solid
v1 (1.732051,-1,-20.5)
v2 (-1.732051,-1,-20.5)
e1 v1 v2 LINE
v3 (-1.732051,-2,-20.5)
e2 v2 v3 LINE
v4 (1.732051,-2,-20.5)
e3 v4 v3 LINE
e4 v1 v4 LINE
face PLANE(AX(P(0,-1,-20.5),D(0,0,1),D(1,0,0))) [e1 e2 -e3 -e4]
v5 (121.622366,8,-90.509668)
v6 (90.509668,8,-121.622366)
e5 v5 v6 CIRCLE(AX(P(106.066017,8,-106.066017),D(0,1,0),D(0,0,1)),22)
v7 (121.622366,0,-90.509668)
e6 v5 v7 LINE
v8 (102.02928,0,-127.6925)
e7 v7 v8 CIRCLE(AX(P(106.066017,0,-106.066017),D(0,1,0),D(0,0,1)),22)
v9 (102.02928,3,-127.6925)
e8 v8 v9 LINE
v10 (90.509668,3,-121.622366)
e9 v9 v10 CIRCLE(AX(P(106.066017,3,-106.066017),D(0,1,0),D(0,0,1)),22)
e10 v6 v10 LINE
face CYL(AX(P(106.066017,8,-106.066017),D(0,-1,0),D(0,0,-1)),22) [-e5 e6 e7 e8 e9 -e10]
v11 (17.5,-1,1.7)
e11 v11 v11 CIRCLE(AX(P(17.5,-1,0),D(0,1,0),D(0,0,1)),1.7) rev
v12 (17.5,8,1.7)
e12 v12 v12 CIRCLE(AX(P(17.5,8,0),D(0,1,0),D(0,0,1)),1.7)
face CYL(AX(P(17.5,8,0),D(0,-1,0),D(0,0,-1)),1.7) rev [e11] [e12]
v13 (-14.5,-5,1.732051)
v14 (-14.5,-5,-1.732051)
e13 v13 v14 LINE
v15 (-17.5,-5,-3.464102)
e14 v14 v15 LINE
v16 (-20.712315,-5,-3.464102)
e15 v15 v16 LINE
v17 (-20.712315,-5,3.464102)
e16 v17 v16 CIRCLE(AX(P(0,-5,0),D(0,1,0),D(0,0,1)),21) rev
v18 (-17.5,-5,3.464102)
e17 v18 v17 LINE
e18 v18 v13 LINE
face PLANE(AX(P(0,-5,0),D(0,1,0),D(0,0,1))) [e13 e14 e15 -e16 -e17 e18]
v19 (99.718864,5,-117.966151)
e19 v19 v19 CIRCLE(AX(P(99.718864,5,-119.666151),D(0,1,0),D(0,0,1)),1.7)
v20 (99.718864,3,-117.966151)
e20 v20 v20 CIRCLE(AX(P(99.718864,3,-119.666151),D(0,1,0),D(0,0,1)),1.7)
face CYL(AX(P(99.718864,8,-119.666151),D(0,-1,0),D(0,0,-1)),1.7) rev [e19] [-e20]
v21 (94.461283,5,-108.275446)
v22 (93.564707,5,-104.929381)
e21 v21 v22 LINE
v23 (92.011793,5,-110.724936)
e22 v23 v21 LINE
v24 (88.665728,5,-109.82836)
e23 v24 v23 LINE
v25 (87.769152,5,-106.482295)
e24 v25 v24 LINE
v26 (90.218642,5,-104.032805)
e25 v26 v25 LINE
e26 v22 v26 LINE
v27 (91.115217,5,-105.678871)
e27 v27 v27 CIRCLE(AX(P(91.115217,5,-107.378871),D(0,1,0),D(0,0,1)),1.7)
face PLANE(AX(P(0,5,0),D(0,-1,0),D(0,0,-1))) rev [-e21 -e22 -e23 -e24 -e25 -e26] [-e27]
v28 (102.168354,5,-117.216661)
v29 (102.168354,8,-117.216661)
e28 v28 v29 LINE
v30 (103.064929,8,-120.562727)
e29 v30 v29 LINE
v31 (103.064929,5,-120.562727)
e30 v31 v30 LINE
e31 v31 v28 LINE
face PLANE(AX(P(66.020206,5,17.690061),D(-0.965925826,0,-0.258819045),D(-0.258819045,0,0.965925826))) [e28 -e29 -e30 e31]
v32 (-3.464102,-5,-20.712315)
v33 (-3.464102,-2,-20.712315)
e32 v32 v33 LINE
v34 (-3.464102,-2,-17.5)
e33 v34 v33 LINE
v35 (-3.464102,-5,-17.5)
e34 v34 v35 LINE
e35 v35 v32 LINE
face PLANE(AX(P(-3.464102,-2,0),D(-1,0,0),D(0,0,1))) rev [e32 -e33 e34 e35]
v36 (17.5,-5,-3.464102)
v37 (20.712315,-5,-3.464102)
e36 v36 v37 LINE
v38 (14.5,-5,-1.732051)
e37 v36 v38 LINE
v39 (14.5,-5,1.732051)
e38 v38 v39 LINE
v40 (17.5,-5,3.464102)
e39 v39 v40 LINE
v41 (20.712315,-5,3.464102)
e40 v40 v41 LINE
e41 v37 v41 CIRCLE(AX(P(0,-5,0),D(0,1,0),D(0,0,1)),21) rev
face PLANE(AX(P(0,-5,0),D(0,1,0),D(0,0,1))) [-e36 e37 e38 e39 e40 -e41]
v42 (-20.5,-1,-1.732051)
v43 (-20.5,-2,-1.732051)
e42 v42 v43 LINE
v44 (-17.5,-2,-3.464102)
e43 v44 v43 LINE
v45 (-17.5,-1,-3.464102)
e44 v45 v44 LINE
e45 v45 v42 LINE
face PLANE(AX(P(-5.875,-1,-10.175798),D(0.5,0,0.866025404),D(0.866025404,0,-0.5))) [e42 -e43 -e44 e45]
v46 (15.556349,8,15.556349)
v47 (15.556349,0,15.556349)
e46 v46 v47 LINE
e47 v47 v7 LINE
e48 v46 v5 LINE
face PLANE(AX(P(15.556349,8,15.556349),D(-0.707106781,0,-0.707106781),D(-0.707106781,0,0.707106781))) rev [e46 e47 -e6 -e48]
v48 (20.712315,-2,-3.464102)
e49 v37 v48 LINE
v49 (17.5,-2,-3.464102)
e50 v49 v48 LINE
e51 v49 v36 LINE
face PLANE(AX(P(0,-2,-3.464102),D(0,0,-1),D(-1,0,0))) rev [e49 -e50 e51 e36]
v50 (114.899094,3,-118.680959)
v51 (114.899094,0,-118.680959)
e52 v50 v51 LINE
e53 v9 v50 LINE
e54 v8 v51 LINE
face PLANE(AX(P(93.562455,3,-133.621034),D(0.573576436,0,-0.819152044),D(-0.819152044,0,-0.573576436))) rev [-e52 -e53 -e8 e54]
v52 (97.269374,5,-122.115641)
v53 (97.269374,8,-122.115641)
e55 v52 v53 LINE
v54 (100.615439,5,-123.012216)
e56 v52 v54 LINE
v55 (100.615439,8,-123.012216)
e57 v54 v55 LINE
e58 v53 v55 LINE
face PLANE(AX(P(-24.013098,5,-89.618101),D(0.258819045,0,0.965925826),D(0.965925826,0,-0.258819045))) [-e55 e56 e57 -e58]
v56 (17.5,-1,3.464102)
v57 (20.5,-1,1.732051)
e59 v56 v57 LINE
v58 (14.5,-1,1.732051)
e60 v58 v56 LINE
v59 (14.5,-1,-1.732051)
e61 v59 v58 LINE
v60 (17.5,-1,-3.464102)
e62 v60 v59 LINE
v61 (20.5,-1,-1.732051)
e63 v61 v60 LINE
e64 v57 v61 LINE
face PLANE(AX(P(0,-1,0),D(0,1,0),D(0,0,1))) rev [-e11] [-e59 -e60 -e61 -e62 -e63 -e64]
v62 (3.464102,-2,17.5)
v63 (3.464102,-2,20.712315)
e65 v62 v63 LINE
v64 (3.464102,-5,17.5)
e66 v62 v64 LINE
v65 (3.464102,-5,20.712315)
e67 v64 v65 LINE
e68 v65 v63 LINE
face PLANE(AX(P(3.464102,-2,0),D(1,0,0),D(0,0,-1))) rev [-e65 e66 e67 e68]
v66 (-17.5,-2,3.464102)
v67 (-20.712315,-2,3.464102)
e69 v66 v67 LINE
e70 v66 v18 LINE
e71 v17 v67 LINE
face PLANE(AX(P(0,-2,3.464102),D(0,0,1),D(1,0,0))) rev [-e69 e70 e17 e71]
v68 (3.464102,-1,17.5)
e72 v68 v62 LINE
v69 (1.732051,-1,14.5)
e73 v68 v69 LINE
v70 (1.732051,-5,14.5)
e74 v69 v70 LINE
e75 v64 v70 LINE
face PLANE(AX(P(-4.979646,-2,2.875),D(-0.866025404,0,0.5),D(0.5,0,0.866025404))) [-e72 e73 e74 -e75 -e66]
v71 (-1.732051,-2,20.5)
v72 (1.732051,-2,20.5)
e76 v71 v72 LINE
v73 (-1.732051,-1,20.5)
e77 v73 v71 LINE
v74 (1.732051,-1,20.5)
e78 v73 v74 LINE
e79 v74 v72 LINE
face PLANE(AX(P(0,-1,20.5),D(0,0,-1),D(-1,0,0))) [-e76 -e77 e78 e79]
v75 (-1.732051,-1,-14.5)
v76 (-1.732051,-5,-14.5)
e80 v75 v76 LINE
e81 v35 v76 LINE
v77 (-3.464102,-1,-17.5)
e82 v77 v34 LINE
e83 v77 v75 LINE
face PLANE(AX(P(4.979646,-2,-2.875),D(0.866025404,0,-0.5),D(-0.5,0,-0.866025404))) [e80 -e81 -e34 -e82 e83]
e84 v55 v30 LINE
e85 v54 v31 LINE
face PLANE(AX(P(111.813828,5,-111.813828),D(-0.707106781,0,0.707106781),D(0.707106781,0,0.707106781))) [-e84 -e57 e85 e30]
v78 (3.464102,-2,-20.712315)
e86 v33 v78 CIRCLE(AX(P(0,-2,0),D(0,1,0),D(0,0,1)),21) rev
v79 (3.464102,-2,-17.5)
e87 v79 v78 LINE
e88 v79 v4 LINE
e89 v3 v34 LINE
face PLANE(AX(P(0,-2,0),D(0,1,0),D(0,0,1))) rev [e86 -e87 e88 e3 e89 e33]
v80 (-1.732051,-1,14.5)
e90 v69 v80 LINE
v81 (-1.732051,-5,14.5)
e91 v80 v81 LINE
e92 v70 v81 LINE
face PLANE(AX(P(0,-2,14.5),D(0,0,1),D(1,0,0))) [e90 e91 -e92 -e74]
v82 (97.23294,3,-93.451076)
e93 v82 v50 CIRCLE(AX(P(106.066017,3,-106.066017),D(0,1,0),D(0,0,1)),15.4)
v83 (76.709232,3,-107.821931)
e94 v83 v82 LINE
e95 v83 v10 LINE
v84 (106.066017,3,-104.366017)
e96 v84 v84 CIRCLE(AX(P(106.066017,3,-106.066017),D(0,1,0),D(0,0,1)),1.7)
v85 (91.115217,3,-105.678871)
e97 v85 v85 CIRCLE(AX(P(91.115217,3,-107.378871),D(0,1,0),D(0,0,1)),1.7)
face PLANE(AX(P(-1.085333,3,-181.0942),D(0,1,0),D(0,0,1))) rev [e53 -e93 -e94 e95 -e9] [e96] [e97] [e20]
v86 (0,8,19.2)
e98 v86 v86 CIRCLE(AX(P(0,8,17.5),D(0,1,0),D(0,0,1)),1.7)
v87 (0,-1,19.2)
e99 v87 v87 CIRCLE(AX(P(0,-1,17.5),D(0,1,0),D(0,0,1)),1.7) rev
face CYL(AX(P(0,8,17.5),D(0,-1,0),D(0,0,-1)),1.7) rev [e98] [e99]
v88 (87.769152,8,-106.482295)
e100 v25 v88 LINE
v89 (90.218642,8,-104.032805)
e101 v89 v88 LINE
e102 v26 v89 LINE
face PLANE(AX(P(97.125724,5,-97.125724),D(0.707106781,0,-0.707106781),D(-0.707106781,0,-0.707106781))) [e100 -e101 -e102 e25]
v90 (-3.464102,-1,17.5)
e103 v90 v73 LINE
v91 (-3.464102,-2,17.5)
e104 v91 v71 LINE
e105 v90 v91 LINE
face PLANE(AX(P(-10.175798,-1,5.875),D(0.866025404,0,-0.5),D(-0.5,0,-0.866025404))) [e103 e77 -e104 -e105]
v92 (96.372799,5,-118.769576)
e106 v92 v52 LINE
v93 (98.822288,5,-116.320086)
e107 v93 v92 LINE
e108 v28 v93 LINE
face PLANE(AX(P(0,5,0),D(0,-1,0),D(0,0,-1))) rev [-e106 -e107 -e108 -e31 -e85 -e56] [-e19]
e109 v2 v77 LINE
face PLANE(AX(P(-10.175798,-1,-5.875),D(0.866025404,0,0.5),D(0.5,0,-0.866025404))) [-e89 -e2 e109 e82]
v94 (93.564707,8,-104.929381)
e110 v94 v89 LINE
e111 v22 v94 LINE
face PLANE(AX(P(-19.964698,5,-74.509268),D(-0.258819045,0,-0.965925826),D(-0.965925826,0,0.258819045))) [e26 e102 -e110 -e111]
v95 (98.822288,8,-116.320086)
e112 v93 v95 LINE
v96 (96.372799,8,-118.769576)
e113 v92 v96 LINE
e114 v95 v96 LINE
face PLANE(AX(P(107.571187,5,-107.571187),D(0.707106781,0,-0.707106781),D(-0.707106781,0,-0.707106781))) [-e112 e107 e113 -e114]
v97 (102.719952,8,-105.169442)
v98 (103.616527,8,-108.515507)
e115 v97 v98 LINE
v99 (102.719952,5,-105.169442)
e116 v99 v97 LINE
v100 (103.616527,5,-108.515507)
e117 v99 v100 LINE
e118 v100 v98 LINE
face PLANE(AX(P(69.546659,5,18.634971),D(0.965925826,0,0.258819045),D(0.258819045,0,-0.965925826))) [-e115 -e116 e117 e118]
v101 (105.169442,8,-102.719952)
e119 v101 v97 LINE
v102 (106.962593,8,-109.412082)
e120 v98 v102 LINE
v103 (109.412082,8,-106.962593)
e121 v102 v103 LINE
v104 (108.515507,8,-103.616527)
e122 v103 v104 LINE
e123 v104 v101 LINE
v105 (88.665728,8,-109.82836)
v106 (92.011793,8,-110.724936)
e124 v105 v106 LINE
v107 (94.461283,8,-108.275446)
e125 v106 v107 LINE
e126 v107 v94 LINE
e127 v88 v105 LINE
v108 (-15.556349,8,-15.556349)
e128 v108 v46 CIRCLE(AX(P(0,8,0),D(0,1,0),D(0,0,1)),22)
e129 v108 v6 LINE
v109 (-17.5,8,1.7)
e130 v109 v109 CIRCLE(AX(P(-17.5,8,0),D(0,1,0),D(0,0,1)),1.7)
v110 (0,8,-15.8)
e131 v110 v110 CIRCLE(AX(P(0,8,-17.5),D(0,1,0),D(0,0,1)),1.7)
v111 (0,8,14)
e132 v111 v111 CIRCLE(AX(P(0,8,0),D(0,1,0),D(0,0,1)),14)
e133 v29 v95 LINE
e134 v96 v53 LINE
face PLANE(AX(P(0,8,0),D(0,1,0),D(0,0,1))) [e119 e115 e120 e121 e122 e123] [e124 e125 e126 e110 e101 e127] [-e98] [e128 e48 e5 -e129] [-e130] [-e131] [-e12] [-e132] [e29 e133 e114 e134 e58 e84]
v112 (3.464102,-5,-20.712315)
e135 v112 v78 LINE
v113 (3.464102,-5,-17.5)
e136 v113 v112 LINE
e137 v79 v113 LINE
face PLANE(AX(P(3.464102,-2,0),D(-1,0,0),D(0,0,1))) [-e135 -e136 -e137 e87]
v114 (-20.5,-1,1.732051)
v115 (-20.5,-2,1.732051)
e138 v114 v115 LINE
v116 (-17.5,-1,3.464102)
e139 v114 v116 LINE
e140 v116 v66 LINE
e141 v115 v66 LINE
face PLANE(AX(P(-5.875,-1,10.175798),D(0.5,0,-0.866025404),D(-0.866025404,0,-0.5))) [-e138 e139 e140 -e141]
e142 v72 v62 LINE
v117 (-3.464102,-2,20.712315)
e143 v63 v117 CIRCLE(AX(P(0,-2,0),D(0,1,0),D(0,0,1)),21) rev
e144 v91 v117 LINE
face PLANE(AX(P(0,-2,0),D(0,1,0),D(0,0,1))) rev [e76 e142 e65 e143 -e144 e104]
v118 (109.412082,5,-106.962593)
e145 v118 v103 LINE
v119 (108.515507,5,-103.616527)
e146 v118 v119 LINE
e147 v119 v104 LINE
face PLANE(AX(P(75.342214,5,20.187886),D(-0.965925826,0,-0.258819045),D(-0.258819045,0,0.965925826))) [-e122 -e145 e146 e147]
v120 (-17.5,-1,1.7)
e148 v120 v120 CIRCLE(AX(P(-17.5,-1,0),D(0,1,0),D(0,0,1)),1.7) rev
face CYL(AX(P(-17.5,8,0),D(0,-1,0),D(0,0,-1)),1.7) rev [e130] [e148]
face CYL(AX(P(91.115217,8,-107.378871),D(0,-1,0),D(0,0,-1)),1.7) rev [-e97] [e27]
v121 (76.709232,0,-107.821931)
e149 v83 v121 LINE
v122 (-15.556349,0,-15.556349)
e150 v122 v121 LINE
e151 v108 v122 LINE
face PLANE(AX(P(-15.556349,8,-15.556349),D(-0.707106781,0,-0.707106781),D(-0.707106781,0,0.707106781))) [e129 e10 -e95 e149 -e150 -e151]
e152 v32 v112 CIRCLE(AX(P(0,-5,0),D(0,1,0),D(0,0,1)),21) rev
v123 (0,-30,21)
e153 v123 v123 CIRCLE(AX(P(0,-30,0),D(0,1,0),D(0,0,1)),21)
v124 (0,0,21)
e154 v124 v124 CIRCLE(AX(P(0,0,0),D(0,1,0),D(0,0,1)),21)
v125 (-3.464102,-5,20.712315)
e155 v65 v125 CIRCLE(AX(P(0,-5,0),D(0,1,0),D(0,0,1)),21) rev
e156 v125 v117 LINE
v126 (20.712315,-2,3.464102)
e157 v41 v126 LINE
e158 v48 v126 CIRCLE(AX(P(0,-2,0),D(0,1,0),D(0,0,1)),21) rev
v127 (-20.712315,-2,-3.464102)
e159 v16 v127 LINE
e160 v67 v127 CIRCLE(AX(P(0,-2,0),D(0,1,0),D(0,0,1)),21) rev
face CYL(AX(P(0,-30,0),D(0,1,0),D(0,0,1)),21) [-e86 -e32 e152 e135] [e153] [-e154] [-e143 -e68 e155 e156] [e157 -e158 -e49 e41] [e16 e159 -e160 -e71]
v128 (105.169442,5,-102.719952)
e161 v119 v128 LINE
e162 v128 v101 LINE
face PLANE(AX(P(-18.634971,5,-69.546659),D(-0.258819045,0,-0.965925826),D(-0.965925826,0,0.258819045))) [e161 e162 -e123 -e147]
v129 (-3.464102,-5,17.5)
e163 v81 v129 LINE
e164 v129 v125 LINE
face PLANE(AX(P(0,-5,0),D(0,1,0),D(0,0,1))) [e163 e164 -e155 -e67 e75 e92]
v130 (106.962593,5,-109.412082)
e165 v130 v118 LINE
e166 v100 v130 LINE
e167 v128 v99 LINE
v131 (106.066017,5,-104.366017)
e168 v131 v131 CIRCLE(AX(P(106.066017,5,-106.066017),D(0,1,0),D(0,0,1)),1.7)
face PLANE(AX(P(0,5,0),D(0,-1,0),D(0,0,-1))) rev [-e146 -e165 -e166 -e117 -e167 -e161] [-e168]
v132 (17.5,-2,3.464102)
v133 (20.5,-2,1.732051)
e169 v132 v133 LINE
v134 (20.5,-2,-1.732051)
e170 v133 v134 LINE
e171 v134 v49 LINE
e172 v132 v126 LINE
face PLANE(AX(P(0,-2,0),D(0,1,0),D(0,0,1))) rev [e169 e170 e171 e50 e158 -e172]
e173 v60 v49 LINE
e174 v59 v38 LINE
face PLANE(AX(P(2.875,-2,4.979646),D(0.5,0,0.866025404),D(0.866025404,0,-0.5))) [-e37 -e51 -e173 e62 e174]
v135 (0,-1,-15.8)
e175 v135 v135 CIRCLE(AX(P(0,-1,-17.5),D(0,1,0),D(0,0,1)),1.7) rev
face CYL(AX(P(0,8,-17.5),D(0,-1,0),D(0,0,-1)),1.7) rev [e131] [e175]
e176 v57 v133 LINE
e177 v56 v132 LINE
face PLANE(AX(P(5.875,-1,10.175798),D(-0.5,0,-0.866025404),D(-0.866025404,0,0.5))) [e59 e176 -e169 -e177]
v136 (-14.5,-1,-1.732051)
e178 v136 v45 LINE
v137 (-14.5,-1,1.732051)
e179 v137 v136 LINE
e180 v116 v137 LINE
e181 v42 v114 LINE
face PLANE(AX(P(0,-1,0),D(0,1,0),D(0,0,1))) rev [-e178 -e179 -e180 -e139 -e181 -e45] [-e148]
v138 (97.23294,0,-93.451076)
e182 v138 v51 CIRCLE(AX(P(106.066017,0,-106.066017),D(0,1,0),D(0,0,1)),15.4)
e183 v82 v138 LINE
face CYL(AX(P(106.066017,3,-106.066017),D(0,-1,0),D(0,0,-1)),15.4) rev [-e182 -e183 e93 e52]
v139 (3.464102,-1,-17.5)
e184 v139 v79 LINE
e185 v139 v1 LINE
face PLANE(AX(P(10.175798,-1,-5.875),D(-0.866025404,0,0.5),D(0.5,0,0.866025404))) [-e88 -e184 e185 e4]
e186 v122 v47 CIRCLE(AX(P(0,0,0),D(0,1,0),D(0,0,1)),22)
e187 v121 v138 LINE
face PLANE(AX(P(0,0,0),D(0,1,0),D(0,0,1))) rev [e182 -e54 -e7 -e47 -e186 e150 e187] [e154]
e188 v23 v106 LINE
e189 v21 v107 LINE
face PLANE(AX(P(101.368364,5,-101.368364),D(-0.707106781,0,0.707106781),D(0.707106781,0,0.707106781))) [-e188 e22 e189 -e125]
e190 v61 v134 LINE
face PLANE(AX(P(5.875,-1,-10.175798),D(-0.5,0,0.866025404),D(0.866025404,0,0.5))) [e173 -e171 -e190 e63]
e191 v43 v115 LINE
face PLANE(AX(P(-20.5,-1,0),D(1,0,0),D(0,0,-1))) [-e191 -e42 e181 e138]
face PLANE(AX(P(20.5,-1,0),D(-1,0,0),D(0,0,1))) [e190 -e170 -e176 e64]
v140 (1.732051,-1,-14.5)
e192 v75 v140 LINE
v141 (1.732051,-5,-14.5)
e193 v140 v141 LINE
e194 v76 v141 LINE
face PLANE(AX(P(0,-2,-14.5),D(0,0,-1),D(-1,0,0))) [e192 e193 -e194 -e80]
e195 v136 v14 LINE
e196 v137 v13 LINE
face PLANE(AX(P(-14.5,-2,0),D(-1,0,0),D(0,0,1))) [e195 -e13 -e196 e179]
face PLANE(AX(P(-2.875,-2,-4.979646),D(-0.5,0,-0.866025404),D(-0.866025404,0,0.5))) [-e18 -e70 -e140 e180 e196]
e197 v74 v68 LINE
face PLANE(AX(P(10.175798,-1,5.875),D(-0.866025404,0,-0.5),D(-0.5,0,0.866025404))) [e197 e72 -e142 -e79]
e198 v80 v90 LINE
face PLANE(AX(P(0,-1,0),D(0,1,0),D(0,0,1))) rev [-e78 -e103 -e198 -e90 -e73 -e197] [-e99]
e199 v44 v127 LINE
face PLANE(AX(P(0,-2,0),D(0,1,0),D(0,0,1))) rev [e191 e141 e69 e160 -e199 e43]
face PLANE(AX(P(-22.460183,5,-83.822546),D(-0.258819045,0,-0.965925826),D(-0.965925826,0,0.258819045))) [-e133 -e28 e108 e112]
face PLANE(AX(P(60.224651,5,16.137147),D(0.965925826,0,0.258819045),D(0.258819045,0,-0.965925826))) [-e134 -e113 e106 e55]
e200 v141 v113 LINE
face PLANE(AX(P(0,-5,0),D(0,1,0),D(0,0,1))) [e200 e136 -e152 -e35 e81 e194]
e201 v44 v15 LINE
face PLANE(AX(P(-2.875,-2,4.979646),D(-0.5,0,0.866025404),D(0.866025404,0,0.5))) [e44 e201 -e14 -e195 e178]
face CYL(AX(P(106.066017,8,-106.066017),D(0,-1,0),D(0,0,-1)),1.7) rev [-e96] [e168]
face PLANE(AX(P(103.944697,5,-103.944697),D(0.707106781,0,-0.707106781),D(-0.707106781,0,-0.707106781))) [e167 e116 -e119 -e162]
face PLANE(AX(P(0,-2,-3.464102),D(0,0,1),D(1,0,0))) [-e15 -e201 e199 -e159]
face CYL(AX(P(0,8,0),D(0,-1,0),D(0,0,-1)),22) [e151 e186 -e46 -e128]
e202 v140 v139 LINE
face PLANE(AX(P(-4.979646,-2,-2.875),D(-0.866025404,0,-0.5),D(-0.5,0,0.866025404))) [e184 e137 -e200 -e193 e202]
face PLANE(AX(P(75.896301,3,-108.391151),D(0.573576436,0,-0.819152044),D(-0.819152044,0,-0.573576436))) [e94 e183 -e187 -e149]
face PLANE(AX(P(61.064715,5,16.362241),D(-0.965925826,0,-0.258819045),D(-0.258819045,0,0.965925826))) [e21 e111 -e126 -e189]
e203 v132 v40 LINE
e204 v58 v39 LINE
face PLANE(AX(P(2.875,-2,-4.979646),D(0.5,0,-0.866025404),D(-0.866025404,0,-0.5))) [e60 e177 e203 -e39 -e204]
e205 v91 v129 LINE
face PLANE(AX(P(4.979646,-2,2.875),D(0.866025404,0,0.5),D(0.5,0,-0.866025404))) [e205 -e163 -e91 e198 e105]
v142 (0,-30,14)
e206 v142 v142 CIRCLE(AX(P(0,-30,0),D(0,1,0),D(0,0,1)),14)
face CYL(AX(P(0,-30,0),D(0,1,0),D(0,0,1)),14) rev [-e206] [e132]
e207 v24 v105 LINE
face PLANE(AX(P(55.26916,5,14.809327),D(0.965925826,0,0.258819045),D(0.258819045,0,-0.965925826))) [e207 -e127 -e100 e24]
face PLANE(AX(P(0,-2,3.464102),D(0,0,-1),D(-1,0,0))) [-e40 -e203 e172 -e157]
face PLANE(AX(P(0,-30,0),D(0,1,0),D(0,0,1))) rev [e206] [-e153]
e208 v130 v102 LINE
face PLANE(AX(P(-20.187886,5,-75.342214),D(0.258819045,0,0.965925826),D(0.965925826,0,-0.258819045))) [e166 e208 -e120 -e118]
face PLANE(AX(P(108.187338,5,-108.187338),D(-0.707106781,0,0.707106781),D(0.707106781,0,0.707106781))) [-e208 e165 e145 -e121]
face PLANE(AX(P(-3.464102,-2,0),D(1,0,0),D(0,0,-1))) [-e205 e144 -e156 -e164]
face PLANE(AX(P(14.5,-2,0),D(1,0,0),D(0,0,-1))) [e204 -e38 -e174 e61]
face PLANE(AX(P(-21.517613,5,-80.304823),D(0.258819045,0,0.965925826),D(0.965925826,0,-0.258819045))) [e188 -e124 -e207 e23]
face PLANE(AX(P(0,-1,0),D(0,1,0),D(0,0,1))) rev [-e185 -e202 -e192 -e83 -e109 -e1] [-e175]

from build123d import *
from build123d.topology import SkipClean

# Parameters (mm, degrees)
BOSS_EXTRUDE1_DEPTH      = 8
SKETCH1_4_R              = 21
SKETCH1_4_R_2            = 14
BOSS_EXTRUDE2_DEPTH      = 30
CUT_EXTRUDE3_START       = -2
SKETCH1_6_R              = 1.7
CUT_EXTRUDE3_DEPTH       = 3
CUT_EXTRUDE4_START       = -2
SKETCH1_7_R              = 1.7
CUT_EXTRUDE4_DEPTH       = 1
CUT_EXTRUDE2_START       = -5
CUT_EXTRUDE2_OUTLINE_R   = 14
CUT_EXTRUDE2_OUTLINE_R_2 = 1.7
CUT_EXTRUDE2_DEPTH       = 13
CUT_EXTRUDE5_START       = 5
SKETCH1_8_R              = 1.7
CUT_EXTRUDE5_DEPTH       = 3
CUT_EXTRUDE6_DEPTH       = 3


# Read off the part's stored shape, not the designer's step: Cut-Extrude2
with BuildPart() as part:
    # Sketch1 → Boss-Extrude1 (new body)
    with BuildSketch(Plane(origin=(0, 0, 0), x_dir=(1, 0, 0), z_dir=(0, 1, 0))):
        with BuildLine():
            Line((-15.556349186, 15.556349186), (90.509667992, 121.622366364))
            ThreePointArc((90.509667992, 121.622366364), (121.622366364, 121.622366364), (121.622366364, 90.509667992))
            Line((121.622366364, 90.509667992), (15.556349186, -15.556349186))
            ThreePointArc((15.556349186, -15.556349186), (-15.556349186, -15.556349186), (-15.556349186, 15.556349186))
        make_face()
    extrude(amount=BOSS_EXTRUDE1_DEPTH)

    # Sketch1<4> → Boss-Extrude2 (add)
    with BuildSketch(Plane(origin=(0, 0, 0), x_dir=(1, 0, 0), z_dir=(0, 1, 0))):
        with Locations(Location((0, 0, 0), (0, 0, 270))):
            Circle(SKETCH1_4_R)
        with Locations(Location((0, 0, 0), (0, 0, 270))):
            Circle(SKETCH1_4_R_2, mode=Mode.SUBTRACT)
    extrude(amount=-BOSS_EXTRUDE2_DEPTH)

    # Sketch1<6> → Cut-Extrude3 (cut)
    # profile 1 of 4: a face of its own
    with BuildSketch(Plane(origin=(0, 0, 0), x_dir=(1, 0, 0), z_dir=(0, 1, 0)).offset(CUT_EXTRUDE3_START)):
        with BuildLine():
            Line((-3.464101615, 17.5), (-1.732050808, 14.5))
            Line((-1.732050808, 14.5), (1.732050808, 14.5))
            Line((1.732050808, 14.5), (3.464101615, 17.5))
            Line((3.464101615, 17.5), (3.464101615, 20.712315177))
            ThreePointArc((3.464101615, 20.712315177), (0, 21), (-3.464101615, 20.712315177))
            Line((-3.464101615, 20.712315177), (-3.464101615, 17.5))
        make_face()
        with Locations(Location((0, 17.5, 0), (0, 0, 270))):
            Circle(SKETCH1_6_R, mode=Mode.SUBTRACT)
    # profile 2 of 4: a face of its own
    with BuildSketch(Plane(origin=(0, 0, 0), x_dir=(1, 0, 0), z_dir=(0, 1, 0)).offset(CUT_EXTRUDE3_START)):
        with BuildLine():
            ThreePointArc((20.712315177, -3.464101615), (21, 0), (20.712315177, 3.464101615))
            Line((20.712315177, 3.464101615), (17.5, 3.464101615))
            Line((17.5, 3.464101615), (14.5, 1.732050808))
            Line((14.5, 1.732050808), (14.5, -1.732050808))
            Line((14.5, -1.732050808), (17.5, -3.464101615))
            Line((17.5, -3.464101615), (20.712315177, -3.464101615))
        make_face()
        with Locations(Location((17.5, 0, 0), (0, 0, 270))):
            Circle(SKETCH1_6_R, mode=Mode.SUBTRACT)
    # profile 3 of 4: a face of its own
    with BuildSketch(Plane(origin=(0, 0, 0), x_dir=(1, 0, 0), z_dir=(0, 1, 0)).offset(CUT_EXTRUDE3_START)):
        with BuildLine():
            Line((-17.5, 3.464101615), (-20.712315177, 3.464101615))
            ThreePointArc((-20.712315177, 3.464101615), (-21, 0), (-20.712315177, -3.464101615))
            Line((-20.712315177, -3.464101615), (-17.5, -3.464101615))
            Line((-17.5, -3.464101615), (-14.5, -1.732050808))
            Line((-14.5, -1.732050808), (-14.5, 1.732050808))
            Line((-14.5, 1.732050808), (-17.5, 3.464101615))
        make_face()
        with Locations(Location((-17.5, 0, 0), (0, 0, 270))):
            Circle(SKETCH1_6_R, mode=Mode.SUBTRACT)
    # profile 4 of 4: a face of its own
    with BuildSketch(Plane(origin=(0, 0, 0), x_dir=(1, 0, 0), z_dir=(0, 1, 0)).offset(CUT_EXTRUDE3_START)):
        with BuildLine():
            ThreePointArc((-3.464101615, -20.712315177), (0, -21), (3.464101615, -20.712315177))
            Line((3.464101615, -20.712315177), (3.464101615, -17.5))
            Line((3.464101615, -17.5), (1.732050808, -14.5))
            Line((1.732050808, -14.5), (-1.732050808, -14.5))
            Line((-1.732050808, -14.5), (-3.464101615, -17.5))
            Line((-3.464101615, -17.5), (-3.464101615, -20.712315177))
        make_face()
        with Locations(Location((0, -17.5, 0), (0, 0, 270))):
            Circle(SKETCH1_6_R, mode=Mode.SUBTRACT)
    extrude(amount=-CUT_EXTRUDE3_DEPTH, mode=Mode.SUBTRACT)

    # Sketch1<7> → Cut-Extrude4 (cut)
    # profile 1 of 4: a face of its own
    with BuildSketch(Plane(origin=(0, 0, 0), x_dir=(1, 0, 0), z_dir=(0, 1, 0)).offset(CUT_EXTRUDE4_START)):
        Polygon((-1.732050808, 20.5), (-3.464101615, 17.5), (-1.732050808, 14.5), (1.732050808, 14.5), (3.464101615, 17.5), (1.732050808, 20.5), align=None)
        with Locations(Location((0, 17.5, 0), (0, 0, 270))):
            Circle(SKETCH1_7_R, mode=Mode.SUBTRACT)
    # profile 2 of 4: a face of its own
    with BuildSketch(Plane(origin=(0, 0, 0), x_dir=(1, 0, 0), z_dir=(0, 1, 0)).offset(CUT_EXTRUDE4_START)):
        Polygon((14.5, -1.732050808), (17.5, -3.464101615), (20.5, -1.732050808), (20.5, 1.732050808), (17.5, 3.464101615), (14.5, 1.732050808), align=None)
        with Locations(Location((17.5, 0, 0), (0, 0, 270))):
            Circle(SKETCH1_7_R, mode=Mode.SUBTRACT)
    # profile 3 of 4: a face of its own
    with BuildSketch(Plane(origin=(0, 0, 0), x_dir=(1, 0, 0), z_dir=(0, 1, 0)).offset(CUT_EXTRUDE4_START)):
        Polygon((-20.5, -1.732050808), (-17.5, -3.464101615), (-14.5, -1.732050808), (-14.5, 1.732050808), (-17.5, 3.464101615), (-20.5, 1.732050808), align=None)
        with Locations(Location((-17.5, 0, 0), (0, 0, 270))):
            Circle(SKETCH1_7_R, mode=Mode.SUBTRACT)
    # profile 4 of 4: a face of its own
    with BuildSketch(Plane(origin=(0, 0, 0), x_dir=(1, 0, 0), z_dir=(0, 1, 0)).offset(CUT_EXTRUDE4_START)):
        Polygon((-1.732050808, -14.5), (-3.464101615, -17.5), (-1.732050808, -20.5), (1.732050808, -20.5), (3.464101615, -17.5), (1.732050808, -14.5), align=None)
        with Locations(Location((0, -17.5, 0), (0, 0, 270))):
            Circle(SKETCH1_7_R, mode=Mode.SUBTRACT)
    extrude(amount=CUT_EXTRUDE4_DEPTH, mode=Mode.SUBTRACT)

    # Cut-Extrude2 outline → Cut-Extrude2 (cut)
    with SkipClean():  # the faces are left unmerged after this step: merging them gives an invalid solid
        with BuildSketch(Plane(origin=(0, 0, 0), x_dir=(1, 0, 0), z_dir=(0, 1, 0)).offset(CUT_EXTRUDE2_START)):
            Circle(CUT_EXTRUDE2_OUTLINE_R)
            with Locations((-17.5, 0)):
                Circle(CUT_EXTRUDE2_OUTLINE_R_2)
            with Locations((0, -17.5)):
                Circle(CUT_EXTRUDE2_OUTLINE_R_2)
            with Locations((17.5, 0)):
                Circle(CUT_EXTRUDE2_OUTLINE_R_2)
            with Locations((0, 17.5)):
                Circle(CUT_EXTRUDE2_OUTLINE_R_2)
            with Locations((99.718863875, 119.666151183)):
                Circle(CUT_EXTRUDE2_OUTLINE_R_2)
            with Locations((106.066017178, 106.066017178)):
                Circle(CUT_EXTRUDE2_OUTLINE_R_2)
            with Locations((91.11521733, 107.378870518)):
                Circle(CUT_EXTRUDE2_OUTLINE_R_2)
        extrude(amount=CUT_EXTRUDE2_DEPTH, mode=Mode.SUBTRACT)

    # Sketch1<8> → Cut-Extrude5 (cut)
    # profile 1 of 3: a face of its own
    with SkipClean():  # the faces are left unmerged after this step: merging them gives an invalid solid
        with BuildSketch(Plane(origin=(0, 0, 0), x_dir=(1, 0, 0), z_dir=(0, 1, 0)).offset(CUT_EXTRUDE5_START)):
            Polygon((102.168353618, 117.21666144), (103.06492909, 120.562726655), (100.615439347, 123.012216398), (97.269374132, 122.115640925), (96.37279866, 118.769575711), (98.822288403, 116.320085968), align=None)
            with Locations(Location((99.718863875, 119.666151183, 0), (0, 0, 270))):
                Circle(SKETCH1_8_R, mode=Mode.SUBTRACT)
        # profile 2 of 3: a face of its own
        with BuildSketch(Plane(origin=(0, 0, 0), x_dir=(1, 0, 0), z_dir=(0, 1, 0)).offset(CUT_EXTRUDE5_START)):
            Polygon((88.665727587, 109.828360261), (87.769152115, 106.482295046), (90.218641857, 104.032805303), (93.564707072, 104.929380776), (94.461282545, 108.275445991), (92.011792802, 110.724935733), align=None)
            with Locations(Location((91.11521733, 107.378870518, 0), (0, 0, 270))):
                Circle(SKETCH1_8_R, mode=Mode.SUBTRACT)
        # profile 3 of 3: a face of its own
        with BuildSketch(Plane(origin=(0, 0, 0), x_dir=(1, 0, 0), z_dir=(0, 1, 0)).offset(CUT_EXTRUDE5_START)):
            Polygon((108.515506921, 103.616527435), (109.412082393, 106.96259265), (106.96259265, 109.412082393), (103.616527435, 108.515506921), (102.719951963, 105.169441706), (105.169441706, 102.719951963), align=None)
            with Locations(Location((106.066017178, 106.066017178, 0), (0, 0, 270))):
                Circle(SKETCH1_8_R, mode=Mode.SUBTRACT)
        extrude(amount=CUT_EXTRUDE5_DEPTH, mode=Mode.SUBTRACT)

    # Sketch1<9> → Cut-Extrude6 (cut)
    with SkipClean():  # the faces are left unmerged after this step: merging them gives an invalid solid
        with BuildSketch(Plane(origin=(0, 0, 0), x_dir=(1, 0, 0), z_dir=(0, 1, 0))):
            with BuildLine():
                Line((97.232940058, 93.451075696), (-9.918409797, 168.479258594))
                ThreePointArc((-9.918409797, 168.479258594), (-13.700274159, 189.927277196), (7.747744443, 193.709141558))
                Line((7.747744443, 193.709141558), (114.899094298, 118.68095866))
                ThreePointArc((114.899094298, 118.68095866), (118.68095866, 97.232940058), (97.232940058, 93.451075696))
            make_face()
        extrude(amount=CUT_EXTRUDE6_DEPTH, mode=Mode.SUBTRACT)


solid = part.part
